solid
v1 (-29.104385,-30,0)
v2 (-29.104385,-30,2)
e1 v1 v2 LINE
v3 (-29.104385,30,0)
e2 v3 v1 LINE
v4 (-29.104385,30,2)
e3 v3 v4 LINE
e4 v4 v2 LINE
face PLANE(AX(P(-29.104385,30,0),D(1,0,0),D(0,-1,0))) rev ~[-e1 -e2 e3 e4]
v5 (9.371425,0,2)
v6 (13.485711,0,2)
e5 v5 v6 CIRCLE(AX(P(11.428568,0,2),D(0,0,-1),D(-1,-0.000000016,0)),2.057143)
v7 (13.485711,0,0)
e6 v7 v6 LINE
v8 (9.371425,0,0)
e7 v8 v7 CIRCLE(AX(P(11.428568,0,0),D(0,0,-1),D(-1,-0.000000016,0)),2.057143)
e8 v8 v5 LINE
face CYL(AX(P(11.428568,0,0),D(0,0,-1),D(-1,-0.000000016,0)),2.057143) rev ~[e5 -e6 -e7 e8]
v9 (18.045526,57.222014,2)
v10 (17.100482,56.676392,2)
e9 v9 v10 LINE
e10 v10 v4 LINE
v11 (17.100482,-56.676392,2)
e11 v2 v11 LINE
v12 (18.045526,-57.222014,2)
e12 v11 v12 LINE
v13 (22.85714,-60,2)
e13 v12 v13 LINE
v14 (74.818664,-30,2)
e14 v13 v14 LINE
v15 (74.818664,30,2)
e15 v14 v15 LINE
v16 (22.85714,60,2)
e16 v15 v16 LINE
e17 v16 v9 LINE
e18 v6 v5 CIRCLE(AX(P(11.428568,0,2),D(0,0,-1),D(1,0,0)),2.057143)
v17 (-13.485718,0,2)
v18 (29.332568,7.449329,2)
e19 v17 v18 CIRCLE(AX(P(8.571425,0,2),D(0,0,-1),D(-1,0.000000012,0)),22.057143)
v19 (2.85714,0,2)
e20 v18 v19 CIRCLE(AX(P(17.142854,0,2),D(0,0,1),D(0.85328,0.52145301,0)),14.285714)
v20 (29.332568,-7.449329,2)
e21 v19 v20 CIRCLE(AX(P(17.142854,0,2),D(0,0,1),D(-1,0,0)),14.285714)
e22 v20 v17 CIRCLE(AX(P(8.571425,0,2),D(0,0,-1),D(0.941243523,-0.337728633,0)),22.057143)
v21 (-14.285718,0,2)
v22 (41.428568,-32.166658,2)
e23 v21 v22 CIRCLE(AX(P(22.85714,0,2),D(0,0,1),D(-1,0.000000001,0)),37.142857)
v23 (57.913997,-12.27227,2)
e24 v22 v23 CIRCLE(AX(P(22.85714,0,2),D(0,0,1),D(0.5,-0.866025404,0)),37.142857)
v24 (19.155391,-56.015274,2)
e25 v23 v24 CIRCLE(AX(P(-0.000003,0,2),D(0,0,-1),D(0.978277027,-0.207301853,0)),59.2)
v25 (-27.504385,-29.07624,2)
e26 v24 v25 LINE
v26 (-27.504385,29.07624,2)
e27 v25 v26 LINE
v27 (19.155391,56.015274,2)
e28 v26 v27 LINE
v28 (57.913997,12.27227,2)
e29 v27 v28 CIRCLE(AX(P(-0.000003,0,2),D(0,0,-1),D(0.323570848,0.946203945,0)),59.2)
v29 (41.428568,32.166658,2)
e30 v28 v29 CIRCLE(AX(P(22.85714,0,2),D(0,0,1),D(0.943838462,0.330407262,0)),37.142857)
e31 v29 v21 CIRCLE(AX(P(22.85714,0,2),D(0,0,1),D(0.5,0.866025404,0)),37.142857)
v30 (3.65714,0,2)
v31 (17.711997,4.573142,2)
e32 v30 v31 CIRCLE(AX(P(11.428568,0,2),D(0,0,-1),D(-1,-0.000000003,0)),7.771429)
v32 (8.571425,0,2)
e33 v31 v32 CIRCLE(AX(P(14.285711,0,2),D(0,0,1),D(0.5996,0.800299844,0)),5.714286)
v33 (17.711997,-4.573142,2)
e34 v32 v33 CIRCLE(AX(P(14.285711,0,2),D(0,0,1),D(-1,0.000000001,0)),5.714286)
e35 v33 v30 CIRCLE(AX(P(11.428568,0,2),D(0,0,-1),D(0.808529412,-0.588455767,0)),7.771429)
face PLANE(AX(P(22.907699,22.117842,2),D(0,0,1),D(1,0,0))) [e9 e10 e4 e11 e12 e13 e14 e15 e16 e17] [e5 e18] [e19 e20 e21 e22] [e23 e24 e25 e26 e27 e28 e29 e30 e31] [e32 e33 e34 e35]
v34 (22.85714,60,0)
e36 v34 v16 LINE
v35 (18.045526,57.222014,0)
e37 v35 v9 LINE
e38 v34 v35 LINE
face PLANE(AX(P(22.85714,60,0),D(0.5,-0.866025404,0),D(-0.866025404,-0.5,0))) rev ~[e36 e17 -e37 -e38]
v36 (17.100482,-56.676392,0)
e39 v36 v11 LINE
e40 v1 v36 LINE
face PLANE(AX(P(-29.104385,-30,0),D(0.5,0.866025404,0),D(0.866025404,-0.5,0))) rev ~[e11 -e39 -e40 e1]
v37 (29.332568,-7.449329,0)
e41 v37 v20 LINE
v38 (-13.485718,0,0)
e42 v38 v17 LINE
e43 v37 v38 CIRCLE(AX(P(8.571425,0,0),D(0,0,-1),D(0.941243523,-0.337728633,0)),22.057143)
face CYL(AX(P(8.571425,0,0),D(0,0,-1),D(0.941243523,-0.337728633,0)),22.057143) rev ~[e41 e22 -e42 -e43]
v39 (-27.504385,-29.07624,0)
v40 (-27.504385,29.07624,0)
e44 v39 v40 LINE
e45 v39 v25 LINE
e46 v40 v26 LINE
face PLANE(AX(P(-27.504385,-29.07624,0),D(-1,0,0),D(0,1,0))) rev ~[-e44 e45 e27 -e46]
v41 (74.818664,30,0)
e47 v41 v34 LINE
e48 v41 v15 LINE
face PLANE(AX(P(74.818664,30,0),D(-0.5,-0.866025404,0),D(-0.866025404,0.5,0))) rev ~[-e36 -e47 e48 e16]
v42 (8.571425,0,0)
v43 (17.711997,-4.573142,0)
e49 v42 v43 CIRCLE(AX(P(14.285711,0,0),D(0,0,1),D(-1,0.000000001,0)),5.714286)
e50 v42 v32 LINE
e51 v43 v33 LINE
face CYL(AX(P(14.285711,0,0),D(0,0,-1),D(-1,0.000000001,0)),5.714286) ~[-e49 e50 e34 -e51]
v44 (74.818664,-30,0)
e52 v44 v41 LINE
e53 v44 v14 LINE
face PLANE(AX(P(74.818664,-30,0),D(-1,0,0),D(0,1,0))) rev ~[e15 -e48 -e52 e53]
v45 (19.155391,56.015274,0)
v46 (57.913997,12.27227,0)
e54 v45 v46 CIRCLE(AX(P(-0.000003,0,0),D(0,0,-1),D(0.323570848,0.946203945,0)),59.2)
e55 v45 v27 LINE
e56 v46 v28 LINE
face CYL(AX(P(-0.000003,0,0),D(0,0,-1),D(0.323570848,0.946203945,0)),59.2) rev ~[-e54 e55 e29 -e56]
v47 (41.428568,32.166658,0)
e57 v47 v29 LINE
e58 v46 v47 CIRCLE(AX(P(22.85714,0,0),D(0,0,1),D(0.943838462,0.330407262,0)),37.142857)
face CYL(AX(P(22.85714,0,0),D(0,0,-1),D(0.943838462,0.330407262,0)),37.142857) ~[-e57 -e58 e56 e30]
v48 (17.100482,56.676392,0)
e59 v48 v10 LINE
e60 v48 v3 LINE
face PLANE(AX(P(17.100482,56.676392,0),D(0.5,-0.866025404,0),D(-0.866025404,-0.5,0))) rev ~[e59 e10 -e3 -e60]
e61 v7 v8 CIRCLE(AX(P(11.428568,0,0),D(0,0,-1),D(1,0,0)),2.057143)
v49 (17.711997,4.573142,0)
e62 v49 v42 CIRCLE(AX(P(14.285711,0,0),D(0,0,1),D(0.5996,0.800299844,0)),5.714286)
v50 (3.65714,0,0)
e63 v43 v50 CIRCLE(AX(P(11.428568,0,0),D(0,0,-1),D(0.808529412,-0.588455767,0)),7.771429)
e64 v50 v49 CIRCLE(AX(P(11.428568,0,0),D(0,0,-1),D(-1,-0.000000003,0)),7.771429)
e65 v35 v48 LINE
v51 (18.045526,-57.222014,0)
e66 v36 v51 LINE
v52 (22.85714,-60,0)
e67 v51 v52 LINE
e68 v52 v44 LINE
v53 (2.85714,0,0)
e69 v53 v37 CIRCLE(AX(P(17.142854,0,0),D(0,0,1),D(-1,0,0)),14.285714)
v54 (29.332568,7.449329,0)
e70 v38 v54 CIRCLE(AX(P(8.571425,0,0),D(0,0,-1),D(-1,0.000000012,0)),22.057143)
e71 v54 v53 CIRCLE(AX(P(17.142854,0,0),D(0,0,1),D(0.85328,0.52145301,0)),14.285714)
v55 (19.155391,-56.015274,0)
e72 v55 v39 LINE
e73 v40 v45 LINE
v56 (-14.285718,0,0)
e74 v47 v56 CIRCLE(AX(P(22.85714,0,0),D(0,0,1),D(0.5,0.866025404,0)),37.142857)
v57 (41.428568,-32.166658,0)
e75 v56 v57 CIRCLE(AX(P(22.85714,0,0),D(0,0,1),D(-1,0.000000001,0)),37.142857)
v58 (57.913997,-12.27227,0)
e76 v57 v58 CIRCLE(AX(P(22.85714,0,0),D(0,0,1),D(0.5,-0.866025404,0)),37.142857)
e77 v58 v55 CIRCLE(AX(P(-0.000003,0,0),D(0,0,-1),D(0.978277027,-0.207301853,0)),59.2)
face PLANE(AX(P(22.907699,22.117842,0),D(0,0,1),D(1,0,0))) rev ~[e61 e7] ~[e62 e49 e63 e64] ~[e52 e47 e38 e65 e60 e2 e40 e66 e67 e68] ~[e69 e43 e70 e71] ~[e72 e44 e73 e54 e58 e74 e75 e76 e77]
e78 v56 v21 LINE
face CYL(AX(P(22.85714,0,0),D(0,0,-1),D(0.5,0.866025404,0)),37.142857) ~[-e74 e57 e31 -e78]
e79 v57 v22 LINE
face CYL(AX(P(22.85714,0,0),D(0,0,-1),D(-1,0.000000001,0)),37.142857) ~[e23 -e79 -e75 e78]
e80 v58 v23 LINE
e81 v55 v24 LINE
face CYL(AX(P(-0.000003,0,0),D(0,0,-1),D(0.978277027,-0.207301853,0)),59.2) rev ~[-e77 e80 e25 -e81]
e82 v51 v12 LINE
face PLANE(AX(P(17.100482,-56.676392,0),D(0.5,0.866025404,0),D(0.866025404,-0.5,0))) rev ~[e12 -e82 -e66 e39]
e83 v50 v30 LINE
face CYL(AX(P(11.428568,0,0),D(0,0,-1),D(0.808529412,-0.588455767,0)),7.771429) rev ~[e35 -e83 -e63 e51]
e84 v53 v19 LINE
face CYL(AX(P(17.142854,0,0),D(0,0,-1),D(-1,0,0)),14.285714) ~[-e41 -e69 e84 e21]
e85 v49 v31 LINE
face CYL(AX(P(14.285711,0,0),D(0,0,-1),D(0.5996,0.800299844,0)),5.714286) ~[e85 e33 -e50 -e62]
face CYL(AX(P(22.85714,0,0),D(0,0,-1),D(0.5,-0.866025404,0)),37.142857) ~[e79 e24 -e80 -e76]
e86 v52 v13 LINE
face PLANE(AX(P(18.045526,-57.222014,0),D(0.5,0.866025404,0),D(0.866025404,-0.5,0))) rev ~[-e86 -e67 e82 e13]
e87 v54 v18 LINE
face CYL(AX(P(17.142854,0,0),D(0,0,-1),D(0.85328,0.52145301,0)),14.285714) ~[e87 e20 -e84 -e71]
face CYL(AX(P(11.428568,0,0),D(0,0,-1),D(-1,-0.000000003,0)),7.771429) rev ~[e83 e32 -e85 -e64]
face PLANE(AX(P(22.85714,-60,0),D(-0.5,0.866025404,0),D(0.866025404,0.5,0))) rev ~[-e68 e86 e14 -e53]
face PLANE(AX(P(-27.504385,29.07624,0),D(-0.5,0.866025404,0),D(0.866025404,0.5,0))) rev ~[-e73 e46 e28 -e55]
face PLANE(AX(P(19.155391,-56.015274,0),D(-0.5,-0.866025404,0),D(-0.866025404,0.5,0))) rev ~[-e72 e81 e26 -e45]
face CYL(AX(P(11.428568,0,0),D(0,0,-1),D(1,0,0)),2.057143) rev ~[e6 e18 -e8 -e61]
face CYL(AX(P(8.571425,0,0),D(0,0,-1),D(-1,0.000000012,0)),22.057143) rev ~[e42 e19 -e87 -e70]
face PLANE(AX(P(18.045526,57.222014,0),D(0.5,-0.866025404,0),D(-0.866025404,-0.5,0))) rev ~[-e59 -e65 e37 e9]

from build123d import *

# Parameters (mm, degrees)
F1_DEPTH = 2


# Not quite as in the source:
# - a feature names something its author has since deleted; it is built from what else it names


with BuildPart() as f1:
    # F0 (on Top) → F1 (new body)
    with BuildSketch(Plane.XY):
        with BuildLine():
            ThreePointArc((57.9139967595, 12.2722697167), (51.4568761016, 23.699090905), (41.428568188, 32.1666578549))
            ThreePointArc((41.428568188, 32.1666578549), (4.2857110581, 32.1666578623), (-14.2857175262, 2.97e-08))
            ThreePointArc((-14.2857175262, 2.97e-08), (-13.7653951877, 4.8492709465), (-12.2281175262, 9.477763266))
            ThreePointArc((-12.2281175262, 9.477763266), (9.6494218868, 33.857930499), (42.2568983073, 30.7319480028))
            ThreePointArc((42.2568983073, 30.7319480028), (54.3309771484, 18.1714285714), (59.1716666402, 1.434709852))
            ThreePointArc((59.1716666402, 1.434709852), (59.1929135394, 0.7174947657), (59.1999967595, 0))
            ThreePointArc((59.1999967595, 0), (58.8776189941, 6.1697325712), (57.9139967595, 12.2722697167))
        make_face()
        with BuildLine():
            ThreePointArc((-12.2281175262, -9.477763266), (-13.765395194, -4.8492709174), (-14.2857175262, 2.97e-08))
            ThreePointArc((-14.2857175262, 2.97e-08), (4.2857110323, -32.1666578474), (41.428568188, -32.1666578549))
            ThreePointArc((41.428568188, -32.1666578549), (51.4568761016, -23.699090905), (57.9139967595, -12.2722697167))
            ThreePointArc((57.9139967595, -12.2722697167), (58.8776189941, -6.1697325712), (59.1999967595, 0))
            ThreePointArc((59.1999967595, 0), (59.1929135394, -0.7174947657), (59.1716666402, -1.434709852))
            ThreePointArc((59.1716666402, -1.434709852), (54.3309771484, -18.1714285714), (42.2568983073, -30.7319480028))
            ThreePointArc((42.2568983073, -30.7319480028), (9.6494218868, -33.857930499), (-12.2281175262, -9.477763266))
        make_face()
        with BuildLine():
            ThreePointArc((-12.2281175262, 9.477763266), (-13.7653951877, 4.8492709465), (-14.2857175262, 2.97e-08))
            ThreePointArc((-14.2857175262, 2.97e-08), (-13.765395194, -4.8492709174), (-12.2281175262, -9.477763266))
            ThreePointArc((-12.2281175262, -9.477763266), (-13.1699457223, -4.7804170624), (-13.4857175262, 2.704e-07))
            ThreePointArc((-13.4857175262, 2.704e-07), (-13.1699456867, 4.7804173304), (-12.2281175262, 9.477763266))
        make_face()
        with BuildLine():
            ThreePointArc((19.1553909751, 56.0152735639), (44.3089741522, 39.2600881611), (57.9139967595, 12.2722697167))
            ThreePointArc((57.9139967595, 12.2722697167), (59.4747834067, 6.2241465278), (59.9999967595, 0))
            ThreePointArc((59.9999967595, 0), (49.011359006, 34.6104950953), (20.070451068, 56.5435837549))
            Line((20.070451068, 56.5435837549), (19.1553909751, 56.0152735639))
        make_face()
        with BuildLine():
            ThreePointArc((59.9999967595, 0), (59.4747834067, 6.2241465278), (57.9139967595, 12.2722697167))
            ThreePointArc((57.9139967595, 12.2722697167), (58.8776189941, 6.1697325712), (59.1999967595, 0))
            ThreePointArc((59.1999967595, 0), (58.8776189941, -6.1697325712), (57.9139967595, -12.2722697167))
            ThreePointArc((57.9139967595, -12.2722697167), (59.4747834067, -6.2241465278), (59.9999967595, 0))
        make_face()
        with BuildLine():
            ThreePointArc((42.2568983073, 30.7319480028), (9.6494218868, 33.857930499), (-12.2281175262, 9.477763266))
            ThreePointArc((-12.2281175262, 9.477763266), (13.4206962629, 22.3368205217), (31.428568188, 0))
            ThreePointArc((31.428568188, 0), (13.4206962629, -22.3368205217), (-12.2281175262, -9.477763266))
            ThreePointArc((-12.2281175262, -9.477763266), (9.6494218868, -33.857930499), (42.2568983073, -30.7319480028))
            ThreePointArc((42.2568983073, -30.7319480028), (54.3309771484, -18.1714285714), (59.1716666402, -1.434709852))
            ThreePointArc((59.1716666402, -1.434709852), (59.1929135394, -0.7174947657), (59.1999967595, 0))
            ThreePointArc((59.1999967595, 0), (59.1929135394, 0.7174947657), (59.1716666402, 1.434709852))
            ThreePointArc((59.1716666402, 1.434709852), (54.3309771484, 18.1714285714), (42.2568983073, 30.7319480028))
        make_face()
        with BuildLine():
            ThreePointArc((31.428568188, 0), (13.4206962629, 22.3368205217), (-12.2281175262, 9.477763266))
            ThreePointArc((-12.2281175262, 9.477763266), (-13.1699456867, 4.7804173304), (-13.4857175262, 2.704e-07))
            ThreePointArc((-13.4857175262, 2.704e-07), (4.7908132688, 21.7307276329), (29.332568188, 7.4493287138))
            ThreePointArc((29.332568188, 7.4493287138), (30.8945884868, 3.8692930325), (31.428568188, 0))
        make_face()
        with BuildLine():
            ThreePointArc((-13.4857175262, 2.704e-07), (-13.1699457223, -4.7804170624), (-12.2281175262, -9.477763266))
            ThreePointArc((-12.2281175262, -9.477763266), (13.4206962629, -22.3368205217), (31.428568188, 0))
            ThreePointArc((31.428568188, 0), (30.8945884868, -3.8692930325), (29.332568188, -7.4493287138))
            ThreePointArc((29.332568188, -7.4493287138), (4.7908130024, -21.7307275866), (-13.4857175262, 2.704e-07))
        make_face()
        with BuildLine():
            ThreePointArc((20.070451068, -56.5435837549), (49.011359006, -34.6104950953), (59.9999967595, 0))
            ThreePointArc((59.9999967595, 0), (59.4747834067, -6.2241465278), (57.9139967595, -12.2722697167))
            ThreePointArc((57.9139967595, -12.2722697167), (44.3089741522, -39.2600881611), (19.1553909751, -56.0152735639))
            Line((19.1553909751, -56.0152735639), (20.070451068, -56.5435837549))
        make_face()
        with BuildLine():
            ThreePointArc((20.070451068, 56.5435837549), (49.011359006, 34.6104950953), (59.9999967595, 0))
            ThreePointArc((59.9999967595, 0), (49.011359006, -34.6104950953), (20.070451068, -56.5435837549))
            Line((20.070451068, -56.5435837549), (22.8571396166, -58.1524791386))
            Line((22.8571396166, -58.1524791386), (73.2186638437, -29.0762395693))
            Line((73.2186638437, -29.0762395693), (73.2186638437, 29.0762395693))
            Line((73.2186638437, 29.0762395693), (22.8571396166, 58.1524791386))
            Line((22.8571396166, 58.1524791386), (20.070451068, 56.5435837549))
        make_face()
        with BuildLine():
            Line((-27.5043846104, 29.0762395693), (19.1553909751, 56.0152735639))
            ThreePointArc((19.1553909751, 56.0152735639), (18.1309499488, 56.3551997286), (17.1004817443, 56.6763920278))
            Line((17.1004817443, 56.6763920278), (-29.1043846104, 30))
            Line((-29.1043846104, 30), (-29.1043846104, -30))
            Line((-29.1043846104, -30), (17.1004817443, -56.6763920278))
            ThreePointArc((17.1004817443, -56.6763920278), (18.1309499488, -56.3551997286), (19.1553909751, -56.0152735639))
            Line((19.1553909751, -56.0152735639), (-27.5043846104, -29.0762395693))
            Line((-27.5043846104, -29.0762395693), (-27.5043846104, 29.0762395693))
        make_face()
        with BuildLine():
            ThreePointArc((17.1004817443, 56.6763920278), (18.1309499488, 56.3551997286), (19.1553909751, 56.0152735639))
            Line((19.1553909751, 56.0152735639), (20.070451068, 56.5435837549))
            ThreePointArc((20.070451068, 56.5435837549), (19.0610073309, 56.891808514), (18.0455263515, 57.2220137862))
            Line((18.0455263515, 57.2220137862), (17.1004817443, 56.6763920278))
        make_face()
        with BuildLine():
            ThreePointArc((29.332568188, -7.4493287138), (30.8945884868, -3.8692930325), (31.428568188, 0))
            ThreePointArc((31.428568188, 0), (30.8945884868, 3.8692930325), (29.332568188, 7.4493287138))
            ThreePointArc((29.332568188, 7.4493287138), (30.3021529406, 3.7806121953), (30.628568188, 0))
            ThreePointArc((30.628568188, 0), (30.3021529406, -3.7806121953), (29.332568188, -7.4493287138))
        make_face()
        with BuildLine():
            Line((22.8571396166, -58.1524791386), (20.070451068, -56.5435837549))
            ThreePointArc((20.070451068, -56.5435837549), (19.0610073309, -56.891808514), (18.0455263515, -57.2220137862))
            Line((18.0455263515, -57.2220137862), (22.8571396166, -60))
            Line((22.8571396166, -60), (74.8186638437, -30))
            Line((74.8186638437, -30), (74.8186638437, 30))
            Line((74.8186638437, 30), (22.8571396166, 60))
            Line((22.8571396166, 60), (18.0455263515, 57.2220137862))
            ThreePointArc((18.0455263515, 57.2220137862), (19.0610073309, 56.891808514), (20.070451068, 56.5435837549))
            Line((20.070451068, 56.5435837549), (22.8571396166, 58.1524791386))
            Line((22.8571396166, 58.1524791386), (73.2186638437, 29.0762395693))
            Line((73.2186638437, 29.0762395693), (73.2186638437, -29.0762395693))
            Line((73.2186638437, -29.0762395693), (22.8571396166, -58.1524791386))
        make_face()
        with BuildLine():
            ThreePointArc((18.0455263515, -57.2220137862), (19.0610073309, -56.891808514), (20.070451068, -56.5435837549))
            Line((20.070451068, -56.5435837549), (19.1553909751, -56.0152735639))
            ThreePointArc((19.1553909751, -56.0152735639), (18.1309499488, -56.3551997286), (17.1004817443, -56.6763920278))
            Line((17.1004817443, -56.6763920278), (18.0455263515, -57.2220137862))
        make_face()
        with BuildLine():
            ThreePointArc((30.628568188, 0), (30.3021529406, 3.7806121953), (29.332568188, 7.4493287138))
            ThreePointArc((29.332568188, 7.4493287138), (13.2735608698, 13.7517345845), (2.8571396166, 0))
            ThreePointArc((2.8571396166, 0), (3.3577591094, 2.8864214127), (4.8011396166, 5.4356764331))
            ThreePointArc((4.8011396166, 5.4356764331), (19.9202319053, 13.1966155216), (30.628568188, 0))
        make_face()
        with BuildLine():
            ThreePointArc((2.8571396166, 0), (13.2735608698, -13.7517345845), (29.332568188, -7.4493287138))
            ThreePointArc((29.332568188, -7.4493287138), (30.3021529406, -3.7806121953), (30.628568188, 0))
            ThreePointArc((30.628568188, 0), (19.9202319053, -13.1966155216), (4.8011396166, -5.4356764331))
            ThreePointArc((4.8011396166, -5.4356764331), (3.3577591094, -2.8864214127), (2.8571396166, 0))
        make_face()
        with BuildLine():
            ThreePointArc((4.8011396166, 5.4356764331), (3.3577591094, 2.8864214127), (2.8571396166, 0))
            ThreePointArc((2.8571396166, 0), (3.3577591094, -2.8864214127), (4.8011396166, -5.4356764331))
            ThreePointArc((4.8011396166, -5.4356764331), (3.9462383831, -2.7773780141), (3.6571396166, -2.26e-08))
            ThreePointArc((3.6571396166, -2.26e-08), (3.9462383784, 2.7773779919), (4.8011396166, 5.4356764331))
        make_face()
        with BuildLine():
            ThreePointArc((4.8011396166, -5.4356764331), (19.9202319053, -13.1966155216), (30.628568188, 0))
            ThreePointArc((30.628568188, 0), (19.9202319053, 13.1966155216), (4.8011396166, 5.4356764331))
            ThreePointArc((4.8011396166, 5.4356764331), (14.3149896007, 8.0708090786), (19.9999967595, 0))
            ThreePointArc((19.9999967595, 0), (14.3149896007, -8.0708090786), (4.8011396166, -5.4356764331))
        make_face()
        with BuildLine():
            ThreePointArc((19.9999967595, 0), (14.3149896007, 8.0708090786), (4.8011396166, 5.4356764331))
            ThreePointArc((4.8011396166, 5.4356764331), (3.9462383784, 2.7773779919), (3.6571396166, -2.26e-08))
            ThreePointArc((3.6571396166, -2.26e-08), (9.0240010942, 7.3900716595), (17.7119967595, 4.5731419646))
            ThreePointArc((17.7119967595, 4.5731419646), (19.3960846487, 2.5567836939), (19.9999967595, 0))
        make_face()
        with BuildLine():
            ThreePointArc((3.6571396166, -2.26e-08), (3.9462383831, -2.7773780141), (4.8011396166, -5.4356764331))
            ThreePointArc((4.8011396166, -5.4356764331), (14.3149896007, -8.0708090786), (19.9999967595, 0))
            ThreePointArc((19.9999967595, 0), (19.3960846487, -2.5567836939), (17.7119967595, -4.5731419646))
            ThreePointArc((17.7119967595, -4.5731419646), (9.0240011157, -7.3900716665), (3.6571396166, -2.26e-08))
        make_face()
        with BuildLine():
            ThreePointArc((17.7119967595, -4.5731419646), (19.3960846487, -2.5567836939), (19.9999967595, 0))
            ThreePointArc((19.9999967595, 0), (19.3960846487, 2.5567836939), (17.7119967595, 4.5731419646))
            ThreePointArc((17.7119967595, 4.5731419646), (18.818639851, 2.4045670831), (19.1999967595, 0))
            ThreePointArc((19.1999967595, 0), (18.818639851, -2.4045670831), (17.7119967595, -4.5731419646))
        make_face()
        with BuildLine():
            ThreePointArc((19.1999967595, 0), (18.818639851, 2.4045670831), (17.7119967595, 4.5731419646))
            ThreePointArc((17.7119967595, 4.5731419646), (11.7289273535, 5.1103736046), (8.5714253309, 4.8e-09))
            ThreePointArc((8.5714253309, 4.8e-09), (8.9714253321, 1.4579829532), (10.0594253309, 2.5077306759))
            ThreePointArc((10.0594253309, 2.5077306759), (15.5859088323, 4.7391655168), (19.1999967595, 0))
        make_face()
        with BuildLine():
            ThreePointArc((8.5714253309, 4.8e-09), (11.7289273492, -5.1103736024), (17.7119967595, -4.5731419646))
            ThreePointArc((17.7119967595, -4.5731419646), (18.818639851, -2.4045670831), (19.1999967595, 0))
            ThreePointArc((19.1999967595, 0), (15.5859088323, -4.7391655168), (10.0594253309, -2.5077306759))
            ThreePointArc((10.0594253309, -2.5077306759), (8.9714253297, -1.457982949), (8.5714253309, 4.8e-09))
        make_face()
        with BuildLine():
            ThreePointArc((10.0594253309, 2.5077306759), (8.9714253321, 1.4579829532), (8.5714253309, 4.8e-09))
            ThreePointArc((8.5714253309, 4.8e-09), (8.9714253297, -1.457982949), (10.0594253309, -2.5077306759))
            ThreePointArc((10.0594253309, -2.5077306759), (9.5465455326, -1.3001978026), (9.3714253309, -3.2e-08))
            ThreePointArc((9.3714253309, -3.2e-08), (9.5465455241, 1.3001977717), (10.0594253309, 2.5077306759))
        make_face()
        with BuildLine():
            ThreePointArc((10.0594253309, -2.5077306759), (15.5859088323, -4.7391655168), (19.1999967595, 0))
            ThreePointArc((19.1999967595, 0), (15.5859088323, 4.7391655168), (10.0594253309, 2.5077306759))
            ThreePointArc((10.0594253309, 2.5077306759), (12.8865511392, 2.4571428571), (14.2857110452, 0))
            ThreePointArc((14.2857110452, 0), (12.8865511392, -2.4571428571), (10.0594253309, -2.5077306759))
        make_face()
        with BuildLine():
            ThreePointArc((14.2857110452, 0), (12.8865511392, 2.4571428571), (10.0594253309, 2.5077306759))
            ThreePointArc((10.0594253309, 2.5077306759), (9.5465455241, 1.3001977717), (9.3714253309, -3.2e-08))
            ThreePointArc((9.3714253309, -3.2e-08), (9.5465455326, -1.3001978026), (10.0594253309, -2.5077306759))
            ThreePointArc((10.0594253309, -2.5077306759), (12.8865511392, -2.4571428571), (14.2857110452, 0))
        make_face()
        with BuildLine():
            ThreePointArc((13.4857110452, 0), (11.4285682041, -2.0571428571), (9.3714253309, -3.2e-08))
            ThreePointArc((9.3714253309, -3.2e-08), (11.428568172, 2.0571428571), (13.4857110452, 0))
        make_face(mode=Mode.SUBTRACT)
    extrude(amount=F1_DEPTH)


solid = f1.part
